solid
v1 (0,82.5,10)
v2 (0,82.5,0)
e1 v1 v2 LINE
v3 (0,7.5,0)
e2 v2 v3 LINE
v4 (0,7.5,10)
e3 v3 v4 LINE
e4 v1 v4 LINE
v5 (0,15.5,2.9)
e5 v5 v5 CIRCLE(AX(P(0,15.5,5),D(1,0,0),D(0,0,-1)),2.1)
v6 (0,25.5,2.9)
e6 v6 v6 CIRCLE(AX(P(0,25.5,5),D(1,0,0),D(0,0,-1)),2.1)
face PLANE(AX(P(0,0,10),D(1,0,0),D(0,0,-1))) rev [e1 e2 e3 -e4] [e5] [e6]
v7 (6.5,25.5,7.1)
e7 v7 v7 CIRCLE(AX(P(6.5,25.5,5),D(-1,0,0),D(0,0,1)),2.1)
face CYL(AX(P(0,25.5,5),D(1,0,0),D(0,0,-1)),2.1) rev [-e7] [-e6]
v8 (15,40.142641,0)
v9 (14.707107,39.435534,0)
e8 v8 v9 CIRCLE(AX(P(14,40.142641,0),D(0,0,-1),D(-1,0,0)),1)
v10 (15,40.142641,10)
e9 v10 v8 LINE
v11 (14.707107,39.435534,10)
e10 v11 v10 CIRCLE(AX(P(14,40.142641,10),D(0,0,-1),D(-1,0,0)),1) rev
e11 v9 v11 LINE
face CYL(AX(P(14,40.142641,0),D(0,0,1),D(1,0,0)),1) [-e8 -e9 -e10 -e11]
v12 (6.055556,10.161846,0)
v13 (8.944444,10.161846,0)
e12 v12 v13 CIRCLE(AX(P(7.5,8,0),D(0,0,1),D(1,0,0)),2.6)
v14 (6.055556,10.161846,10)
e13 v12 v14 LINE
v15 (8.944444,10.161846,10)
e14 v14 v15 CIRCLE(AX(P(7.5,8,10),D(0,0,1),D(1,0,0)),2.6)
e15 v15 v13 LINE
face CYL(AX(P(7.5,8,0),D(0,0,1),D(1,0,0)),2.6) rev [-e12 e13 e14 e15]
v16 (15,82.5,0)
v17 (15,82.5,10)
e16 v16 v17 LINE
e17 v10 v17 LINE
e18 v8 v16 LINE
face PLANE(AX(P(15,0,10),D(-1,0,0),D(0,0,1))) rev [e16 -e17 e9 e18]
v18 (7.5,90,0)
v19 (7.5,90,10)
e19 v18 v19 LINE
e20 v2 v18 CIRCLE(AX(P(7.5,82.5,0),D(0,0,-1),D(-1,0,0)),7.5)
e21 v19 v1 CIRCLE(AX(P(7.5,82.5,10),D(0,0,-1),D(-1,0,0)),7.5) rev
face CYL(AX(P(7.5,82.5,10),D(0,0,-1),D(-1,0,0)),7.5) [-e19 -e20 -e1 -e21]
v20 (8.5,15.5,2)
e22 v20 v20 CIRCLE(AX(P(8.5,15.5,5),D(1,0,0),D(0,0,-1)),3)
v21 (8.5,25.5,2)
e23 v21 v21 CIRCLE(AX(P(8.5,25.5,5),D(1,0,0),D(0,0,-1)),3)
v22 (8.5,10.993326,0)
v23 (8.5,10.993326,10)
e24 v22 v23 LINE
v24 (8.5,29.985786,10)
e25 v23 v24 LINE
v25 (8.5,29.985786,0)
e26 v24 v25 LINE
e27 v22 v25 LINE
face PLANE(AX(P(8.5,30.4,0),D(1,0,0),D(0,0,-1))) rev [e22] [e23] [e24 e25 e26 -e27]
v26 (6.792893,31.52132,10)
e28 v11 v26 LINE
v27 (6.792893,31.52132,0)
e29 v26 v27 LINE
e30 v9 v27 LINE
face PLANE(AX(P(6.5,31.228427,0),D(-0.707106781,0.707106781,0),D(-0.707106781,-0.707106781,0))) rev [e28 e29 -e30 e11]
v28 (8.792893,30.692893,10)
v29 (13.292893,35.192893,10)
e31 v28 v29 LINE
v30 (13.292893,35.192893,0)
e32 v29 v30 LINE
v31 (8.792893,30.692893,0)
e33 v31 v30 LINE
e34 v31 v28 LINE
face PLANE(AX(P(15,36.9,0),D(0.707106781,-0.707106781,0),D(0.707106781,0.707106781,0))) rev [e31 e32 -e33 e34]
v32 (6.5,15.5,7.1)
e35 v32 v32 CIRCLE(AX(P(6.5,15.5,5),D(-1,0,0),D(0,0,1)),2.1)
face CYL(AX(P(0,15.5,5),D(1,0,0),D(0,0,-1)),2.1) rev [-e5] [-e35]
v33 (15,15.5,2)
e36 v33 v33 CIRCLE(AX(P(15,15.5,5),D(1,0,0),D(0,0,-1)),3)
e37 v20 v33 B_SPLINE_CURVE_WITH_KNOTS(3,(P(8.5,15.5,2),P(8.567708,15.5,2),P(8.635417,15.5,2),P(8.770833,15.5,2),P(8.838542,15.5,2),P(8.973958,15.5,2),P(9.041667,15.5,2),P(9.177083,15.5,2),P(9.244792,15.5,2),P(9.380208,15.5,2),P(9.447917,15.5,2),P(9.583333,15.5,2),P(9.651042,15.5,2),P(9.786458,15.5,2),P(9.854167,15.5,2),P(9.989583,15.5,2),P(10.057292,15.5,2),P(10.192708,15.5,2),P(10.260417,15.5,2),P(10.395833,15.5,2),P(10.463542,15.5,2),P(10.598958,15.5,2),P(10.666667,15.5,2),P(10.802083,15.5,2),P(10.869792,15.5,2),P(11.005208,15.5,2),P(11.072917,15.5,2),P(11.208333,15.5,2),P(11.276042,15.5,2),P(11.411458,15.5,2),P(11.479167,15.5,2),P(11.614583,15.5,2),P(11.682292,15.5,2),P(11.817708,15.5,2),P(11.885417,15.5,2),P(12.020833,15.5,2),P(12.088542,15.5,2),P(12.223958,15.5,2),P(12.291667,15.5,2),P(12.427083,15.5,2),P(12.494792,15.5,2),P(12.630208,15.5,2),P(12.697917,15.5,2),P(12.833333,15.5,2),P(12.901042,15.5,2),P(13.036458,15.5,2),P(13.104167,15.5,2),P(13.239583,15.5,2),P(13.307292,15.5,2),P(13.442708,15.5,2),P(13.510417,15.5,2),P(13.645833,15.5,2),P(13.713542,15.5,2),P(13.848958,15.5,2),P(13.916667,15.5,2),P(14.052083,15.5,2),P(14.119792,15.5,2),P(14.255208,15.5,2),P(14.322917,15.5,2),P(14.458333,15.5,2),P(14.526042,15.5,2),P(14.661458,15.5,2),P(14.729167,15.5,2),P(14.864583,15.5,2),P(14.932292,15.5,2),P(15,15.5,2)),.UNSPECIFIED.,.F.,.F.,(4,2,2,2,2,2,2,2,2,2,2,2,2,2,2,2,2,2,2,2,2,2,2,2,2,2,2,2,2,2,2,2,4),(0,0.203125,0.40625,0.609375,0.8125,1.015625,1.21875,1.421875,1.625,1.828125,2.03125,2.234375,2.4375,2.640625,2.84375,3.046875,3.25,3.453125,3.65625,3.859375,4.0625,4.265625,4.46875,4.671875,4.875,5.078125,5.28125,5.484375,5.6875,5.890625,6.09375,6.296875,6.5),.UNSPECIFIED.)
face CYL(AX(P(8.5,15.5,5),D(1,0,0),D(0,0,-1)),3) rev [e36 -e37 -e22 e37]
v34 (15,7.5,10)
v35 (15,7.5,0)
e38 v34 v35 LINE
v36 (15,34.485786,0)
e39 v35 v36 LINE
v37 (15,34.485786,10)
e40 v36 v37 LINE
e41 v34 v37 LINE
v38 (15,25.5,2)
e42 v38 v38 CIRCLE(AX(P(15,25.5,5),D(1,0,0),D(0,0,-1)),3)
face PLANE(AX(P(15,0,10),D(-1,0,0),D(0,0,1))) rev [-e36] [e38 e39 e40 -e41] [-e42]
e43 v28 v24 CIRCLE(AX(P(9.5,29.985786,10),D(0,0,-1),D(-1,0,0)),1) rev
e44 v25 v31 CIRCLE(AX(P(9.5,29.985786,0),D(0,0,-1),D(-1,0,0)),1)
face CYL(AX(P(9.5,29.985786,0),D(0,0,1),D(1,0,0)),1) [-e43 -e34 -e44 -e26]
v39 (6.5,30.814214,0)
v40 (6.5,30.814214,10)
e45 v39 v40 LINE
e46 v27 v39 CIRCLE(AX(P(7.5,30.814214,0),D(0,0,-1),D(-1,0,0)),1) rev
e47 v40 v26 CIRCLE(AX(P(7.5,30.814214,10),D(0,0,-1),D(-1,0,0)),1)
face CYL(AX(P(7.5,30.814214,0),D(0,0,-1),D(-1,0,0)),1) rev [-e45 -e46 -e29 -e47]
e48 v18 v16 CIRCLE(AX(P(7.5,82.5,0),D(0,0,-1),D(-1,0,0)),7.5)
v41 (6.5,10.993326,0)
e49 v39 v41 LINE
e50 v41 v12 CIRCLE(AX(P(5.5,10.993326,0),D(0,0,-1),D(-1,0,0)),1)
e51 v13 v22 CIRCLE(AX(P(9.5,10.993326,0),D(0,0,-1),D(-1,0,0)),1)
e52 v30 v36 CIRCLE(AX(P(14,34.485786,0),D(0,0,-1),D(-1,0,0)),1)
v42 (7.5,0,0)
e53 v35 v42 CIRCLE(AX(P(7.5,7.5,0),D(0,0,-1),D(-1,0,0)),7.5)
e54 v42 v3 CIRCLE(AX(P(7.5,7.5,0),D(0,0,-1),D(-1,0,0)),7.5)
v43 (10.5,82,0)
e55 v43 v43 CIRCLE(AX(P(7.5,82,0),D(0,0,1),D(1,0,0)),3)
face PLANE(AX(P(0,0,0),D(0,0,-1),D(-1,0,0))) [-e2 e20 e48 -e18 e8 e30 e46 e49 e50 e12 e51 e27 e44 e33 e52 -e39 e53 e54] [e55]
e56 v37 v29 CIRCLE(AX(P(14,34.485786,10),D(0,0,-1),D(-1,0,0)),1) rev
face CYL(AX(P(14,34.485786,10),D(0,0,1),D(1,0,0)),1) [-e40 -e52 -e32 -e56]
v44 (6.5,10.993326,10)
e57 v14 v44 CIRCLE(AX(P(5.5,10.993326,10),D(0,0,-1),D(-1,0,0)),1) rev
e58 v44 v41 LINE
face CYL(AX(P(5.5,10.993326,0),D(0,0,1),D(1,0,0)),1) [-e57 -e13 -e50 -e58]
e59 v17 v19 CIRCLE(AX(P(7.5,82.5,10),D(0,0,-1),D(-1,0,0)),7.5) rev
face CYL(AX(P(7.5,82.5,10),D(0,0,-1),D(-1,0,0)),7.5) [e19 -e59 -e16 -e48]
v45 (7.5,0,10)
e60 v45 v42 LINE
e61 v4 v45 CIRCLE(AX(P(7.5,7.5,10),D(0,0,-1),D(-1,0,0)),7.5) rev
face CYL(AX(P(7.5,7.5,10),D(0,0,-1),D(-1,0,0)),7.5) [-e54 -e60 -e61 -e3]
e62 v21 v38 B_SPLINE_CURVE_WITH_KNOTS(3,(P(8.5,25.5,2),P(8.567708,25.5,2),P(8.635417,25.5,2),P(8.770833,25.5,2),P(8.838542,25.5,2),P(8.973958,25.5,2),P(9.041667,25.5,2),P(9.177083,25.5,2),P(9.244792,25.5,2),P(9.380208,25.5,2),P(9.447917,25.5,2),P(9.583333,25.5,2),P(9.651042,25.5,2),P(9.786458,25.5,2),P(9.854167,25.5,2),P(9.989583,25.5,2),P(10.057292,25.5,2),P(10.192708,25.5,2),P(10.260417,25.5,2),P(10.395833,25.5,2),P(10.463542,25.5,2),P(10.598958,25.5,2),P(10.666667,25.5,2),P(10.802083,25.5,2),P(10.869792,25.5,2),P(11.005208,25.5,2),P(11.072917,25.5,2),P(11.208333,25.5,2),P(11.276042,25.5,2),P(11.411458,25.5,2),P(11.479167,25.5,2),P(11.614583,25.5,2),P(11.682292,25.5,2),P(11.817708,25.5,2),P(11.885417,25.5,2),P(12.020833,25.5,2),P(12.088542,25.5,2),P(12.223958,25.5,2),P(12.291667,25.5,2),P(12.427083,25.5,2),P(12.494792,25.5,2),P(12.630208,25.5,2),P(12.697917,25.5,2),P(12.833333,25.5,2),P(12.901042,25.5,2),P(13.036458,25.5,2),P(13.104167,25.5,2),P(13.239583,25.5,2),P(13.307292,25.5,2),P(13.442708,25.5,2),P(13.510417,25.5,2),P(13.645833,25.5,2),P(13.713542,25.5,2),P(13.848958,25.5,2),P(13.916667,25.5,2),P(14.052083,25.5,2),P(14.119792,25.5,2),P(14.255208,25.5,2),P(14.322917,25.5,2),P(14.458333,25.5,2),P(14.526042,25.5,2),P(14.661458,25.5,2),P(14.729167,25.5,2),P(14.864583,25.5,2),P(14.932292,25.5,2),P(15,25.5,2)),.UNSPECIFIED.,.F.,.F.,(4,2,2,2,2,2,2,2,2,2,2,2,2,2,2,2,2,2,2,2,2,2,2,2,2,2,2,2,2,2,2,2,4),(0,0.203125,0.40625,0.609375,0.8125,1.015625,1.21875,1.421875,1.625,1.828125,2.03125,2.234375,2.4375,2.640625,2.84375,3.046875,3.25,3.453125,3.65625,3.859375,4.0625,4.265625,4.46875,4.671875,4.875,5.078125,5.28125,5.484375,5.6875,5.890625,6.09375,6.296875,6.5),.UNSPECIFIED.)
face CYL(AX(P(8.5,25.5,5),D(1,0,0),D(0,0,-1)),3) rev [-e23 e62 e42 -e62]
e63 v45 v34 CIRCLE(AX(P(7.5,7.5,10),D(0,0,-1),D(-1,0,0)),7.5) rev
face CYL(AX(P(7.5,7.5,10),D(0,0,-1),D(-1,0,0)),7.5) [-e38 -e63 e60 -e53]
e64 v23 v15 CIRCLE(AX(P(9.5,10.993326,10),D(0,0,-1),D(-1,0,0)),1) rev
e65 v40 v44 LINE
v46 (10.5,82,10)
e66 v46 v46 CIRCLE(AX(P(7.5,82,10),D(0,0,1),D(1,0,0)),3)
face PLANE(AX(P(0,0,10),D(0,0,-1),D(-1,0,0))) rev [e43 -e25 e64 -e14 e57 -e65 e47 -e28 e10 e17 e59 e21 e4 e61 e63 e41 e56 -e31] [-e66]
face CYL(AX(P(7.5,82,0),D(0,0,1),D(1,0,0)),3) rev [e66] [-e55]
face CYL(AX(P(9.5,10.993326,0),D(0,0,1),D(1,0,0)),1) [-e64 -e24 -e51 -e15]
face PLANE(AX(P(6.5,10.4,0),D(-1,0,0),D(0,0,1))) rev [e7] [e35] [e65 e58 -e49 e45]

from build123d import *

# Parameters (mm, degrees)
ESQUISSE1_W             = 15
ESQUISSE1_H             = 90
BOSS_EXTRU_1_DEPTH      = 10
ESQUISSE2_R             = 3
ESQUISSE2_R_2           = 2.6
ENL_V_MAT_EXTRU_1_DEPTH = 10
CONG_1_R                = 7.5
ENL_V_MAT_EXTRU_2_DEPTH = 92.787798753
ESQUISSE4_R             = 2.1
ENL_V_MAT_EXTRU_3_DEPTH = 92.787798753
ESQUISSE5_R             = 3
ENL_V_MAT_EXTRU_4_DEPTH = 6.5
CONG_2_R                = 1


with BuildPart() as part:
    # Esquisse1 → Boss.-Extru.1 (new body)
    with BuildSketch(Plane.XY):
        with Locations((7.5, 45)):
            Rectangle(ESQUISSE1_W, ESQUISSE1_H)
    extrude(amount=BOSS_EXTRU_1_DEPTH)

    # Esquisse2 → Enlèv. mat.-Extru.1 (cut)
    with BuildSketch(Plane.XY.offset(10)):
        with Locations((7.5, 82)):
            Circle(ESQUISSE2_R)
        with Locations((7.5, 8)):
            Circle(ESQUISSE2_R_2)
    extrude(amount=-ENL_V_MAT_EXTRU_1_DEPTH, mode=Mode.SUBTRACT)

    # Congé1
    cong_1_edges = [part.edges().sort_by_distance(p)[0] for p in [
        (15, 90, 5),
        (0, 90, 5),
        (15, 0, 5),
        (0, 0, 5),
    ]]
    fillet(cong_1_edges, radius=CONG_1_R - 0.0001)  # a hair under: the kernel refuses the full size

    # Esquisse3 → Enlèv. mat.-Extru.2 (cut, through all)
    with BuildSketch(Plane.XY.offset(10)):
        Polygon((6.5, 10.4), (6.5, 31.228427125), (15, 39.728427125), (15, 36.9), (8.5, 30.4), (8.5, 10.4), align=None)
    extrude(amount=-ENL_V_MAT_EXTRU_2_DEPTH, mode=Mode.SUBTRACT)

    # Esquisse4 → Enlèv. mat.-Extru.3 (cut, through all)
    with BuildSketch(Plane(origin=(15, 0, 0), x_dir=(0, 0, -1), z_dir=(1, 0, 0))):
        with Locations((-5, 15.5)):
            Circle(ESQUISSE4_R)
        with Locations((-5, 25.5)):
            Circle(ESQUISSE4_R)
    extrude(amount=-ENL_V_MAT_EXTRU_3_DEPTH, mode=Mode.SUBTRACT)

    # Esquisse5 → Enlèv. mat.-Extru.4 (cut)
    with BuildSketch(Plane(origin=(15, 0, 0), x_dir=(0, 0, -1), z_dir=(1, 0, 0))):
        with Locations((-5, 25.5)):
            Circle(ESQUISSE5_R)
        with Locations((-5, 15.5)):
            Circle(ESQUISSE5_R)
    extrude(amount=-ENL_V_MAT_EXTRU_4_DEPTH, mode=Mode.SUBTRACT)

    # Congé2
    cong_2_edges = [part.edges().sort_by_distance(p)[0] for p in [
        (8.5, 10.4, 5),
        (6.5, 10.4, 5),
        (6.5, 31.228427125, 5),
        (15, 39.728427125, 5),
        (15, 36.9, 5),
        (8.5, 30.4, 5),
    ]]
    fillet(cong_2_edges, radius=CONG_2_R)


solid = part.part
